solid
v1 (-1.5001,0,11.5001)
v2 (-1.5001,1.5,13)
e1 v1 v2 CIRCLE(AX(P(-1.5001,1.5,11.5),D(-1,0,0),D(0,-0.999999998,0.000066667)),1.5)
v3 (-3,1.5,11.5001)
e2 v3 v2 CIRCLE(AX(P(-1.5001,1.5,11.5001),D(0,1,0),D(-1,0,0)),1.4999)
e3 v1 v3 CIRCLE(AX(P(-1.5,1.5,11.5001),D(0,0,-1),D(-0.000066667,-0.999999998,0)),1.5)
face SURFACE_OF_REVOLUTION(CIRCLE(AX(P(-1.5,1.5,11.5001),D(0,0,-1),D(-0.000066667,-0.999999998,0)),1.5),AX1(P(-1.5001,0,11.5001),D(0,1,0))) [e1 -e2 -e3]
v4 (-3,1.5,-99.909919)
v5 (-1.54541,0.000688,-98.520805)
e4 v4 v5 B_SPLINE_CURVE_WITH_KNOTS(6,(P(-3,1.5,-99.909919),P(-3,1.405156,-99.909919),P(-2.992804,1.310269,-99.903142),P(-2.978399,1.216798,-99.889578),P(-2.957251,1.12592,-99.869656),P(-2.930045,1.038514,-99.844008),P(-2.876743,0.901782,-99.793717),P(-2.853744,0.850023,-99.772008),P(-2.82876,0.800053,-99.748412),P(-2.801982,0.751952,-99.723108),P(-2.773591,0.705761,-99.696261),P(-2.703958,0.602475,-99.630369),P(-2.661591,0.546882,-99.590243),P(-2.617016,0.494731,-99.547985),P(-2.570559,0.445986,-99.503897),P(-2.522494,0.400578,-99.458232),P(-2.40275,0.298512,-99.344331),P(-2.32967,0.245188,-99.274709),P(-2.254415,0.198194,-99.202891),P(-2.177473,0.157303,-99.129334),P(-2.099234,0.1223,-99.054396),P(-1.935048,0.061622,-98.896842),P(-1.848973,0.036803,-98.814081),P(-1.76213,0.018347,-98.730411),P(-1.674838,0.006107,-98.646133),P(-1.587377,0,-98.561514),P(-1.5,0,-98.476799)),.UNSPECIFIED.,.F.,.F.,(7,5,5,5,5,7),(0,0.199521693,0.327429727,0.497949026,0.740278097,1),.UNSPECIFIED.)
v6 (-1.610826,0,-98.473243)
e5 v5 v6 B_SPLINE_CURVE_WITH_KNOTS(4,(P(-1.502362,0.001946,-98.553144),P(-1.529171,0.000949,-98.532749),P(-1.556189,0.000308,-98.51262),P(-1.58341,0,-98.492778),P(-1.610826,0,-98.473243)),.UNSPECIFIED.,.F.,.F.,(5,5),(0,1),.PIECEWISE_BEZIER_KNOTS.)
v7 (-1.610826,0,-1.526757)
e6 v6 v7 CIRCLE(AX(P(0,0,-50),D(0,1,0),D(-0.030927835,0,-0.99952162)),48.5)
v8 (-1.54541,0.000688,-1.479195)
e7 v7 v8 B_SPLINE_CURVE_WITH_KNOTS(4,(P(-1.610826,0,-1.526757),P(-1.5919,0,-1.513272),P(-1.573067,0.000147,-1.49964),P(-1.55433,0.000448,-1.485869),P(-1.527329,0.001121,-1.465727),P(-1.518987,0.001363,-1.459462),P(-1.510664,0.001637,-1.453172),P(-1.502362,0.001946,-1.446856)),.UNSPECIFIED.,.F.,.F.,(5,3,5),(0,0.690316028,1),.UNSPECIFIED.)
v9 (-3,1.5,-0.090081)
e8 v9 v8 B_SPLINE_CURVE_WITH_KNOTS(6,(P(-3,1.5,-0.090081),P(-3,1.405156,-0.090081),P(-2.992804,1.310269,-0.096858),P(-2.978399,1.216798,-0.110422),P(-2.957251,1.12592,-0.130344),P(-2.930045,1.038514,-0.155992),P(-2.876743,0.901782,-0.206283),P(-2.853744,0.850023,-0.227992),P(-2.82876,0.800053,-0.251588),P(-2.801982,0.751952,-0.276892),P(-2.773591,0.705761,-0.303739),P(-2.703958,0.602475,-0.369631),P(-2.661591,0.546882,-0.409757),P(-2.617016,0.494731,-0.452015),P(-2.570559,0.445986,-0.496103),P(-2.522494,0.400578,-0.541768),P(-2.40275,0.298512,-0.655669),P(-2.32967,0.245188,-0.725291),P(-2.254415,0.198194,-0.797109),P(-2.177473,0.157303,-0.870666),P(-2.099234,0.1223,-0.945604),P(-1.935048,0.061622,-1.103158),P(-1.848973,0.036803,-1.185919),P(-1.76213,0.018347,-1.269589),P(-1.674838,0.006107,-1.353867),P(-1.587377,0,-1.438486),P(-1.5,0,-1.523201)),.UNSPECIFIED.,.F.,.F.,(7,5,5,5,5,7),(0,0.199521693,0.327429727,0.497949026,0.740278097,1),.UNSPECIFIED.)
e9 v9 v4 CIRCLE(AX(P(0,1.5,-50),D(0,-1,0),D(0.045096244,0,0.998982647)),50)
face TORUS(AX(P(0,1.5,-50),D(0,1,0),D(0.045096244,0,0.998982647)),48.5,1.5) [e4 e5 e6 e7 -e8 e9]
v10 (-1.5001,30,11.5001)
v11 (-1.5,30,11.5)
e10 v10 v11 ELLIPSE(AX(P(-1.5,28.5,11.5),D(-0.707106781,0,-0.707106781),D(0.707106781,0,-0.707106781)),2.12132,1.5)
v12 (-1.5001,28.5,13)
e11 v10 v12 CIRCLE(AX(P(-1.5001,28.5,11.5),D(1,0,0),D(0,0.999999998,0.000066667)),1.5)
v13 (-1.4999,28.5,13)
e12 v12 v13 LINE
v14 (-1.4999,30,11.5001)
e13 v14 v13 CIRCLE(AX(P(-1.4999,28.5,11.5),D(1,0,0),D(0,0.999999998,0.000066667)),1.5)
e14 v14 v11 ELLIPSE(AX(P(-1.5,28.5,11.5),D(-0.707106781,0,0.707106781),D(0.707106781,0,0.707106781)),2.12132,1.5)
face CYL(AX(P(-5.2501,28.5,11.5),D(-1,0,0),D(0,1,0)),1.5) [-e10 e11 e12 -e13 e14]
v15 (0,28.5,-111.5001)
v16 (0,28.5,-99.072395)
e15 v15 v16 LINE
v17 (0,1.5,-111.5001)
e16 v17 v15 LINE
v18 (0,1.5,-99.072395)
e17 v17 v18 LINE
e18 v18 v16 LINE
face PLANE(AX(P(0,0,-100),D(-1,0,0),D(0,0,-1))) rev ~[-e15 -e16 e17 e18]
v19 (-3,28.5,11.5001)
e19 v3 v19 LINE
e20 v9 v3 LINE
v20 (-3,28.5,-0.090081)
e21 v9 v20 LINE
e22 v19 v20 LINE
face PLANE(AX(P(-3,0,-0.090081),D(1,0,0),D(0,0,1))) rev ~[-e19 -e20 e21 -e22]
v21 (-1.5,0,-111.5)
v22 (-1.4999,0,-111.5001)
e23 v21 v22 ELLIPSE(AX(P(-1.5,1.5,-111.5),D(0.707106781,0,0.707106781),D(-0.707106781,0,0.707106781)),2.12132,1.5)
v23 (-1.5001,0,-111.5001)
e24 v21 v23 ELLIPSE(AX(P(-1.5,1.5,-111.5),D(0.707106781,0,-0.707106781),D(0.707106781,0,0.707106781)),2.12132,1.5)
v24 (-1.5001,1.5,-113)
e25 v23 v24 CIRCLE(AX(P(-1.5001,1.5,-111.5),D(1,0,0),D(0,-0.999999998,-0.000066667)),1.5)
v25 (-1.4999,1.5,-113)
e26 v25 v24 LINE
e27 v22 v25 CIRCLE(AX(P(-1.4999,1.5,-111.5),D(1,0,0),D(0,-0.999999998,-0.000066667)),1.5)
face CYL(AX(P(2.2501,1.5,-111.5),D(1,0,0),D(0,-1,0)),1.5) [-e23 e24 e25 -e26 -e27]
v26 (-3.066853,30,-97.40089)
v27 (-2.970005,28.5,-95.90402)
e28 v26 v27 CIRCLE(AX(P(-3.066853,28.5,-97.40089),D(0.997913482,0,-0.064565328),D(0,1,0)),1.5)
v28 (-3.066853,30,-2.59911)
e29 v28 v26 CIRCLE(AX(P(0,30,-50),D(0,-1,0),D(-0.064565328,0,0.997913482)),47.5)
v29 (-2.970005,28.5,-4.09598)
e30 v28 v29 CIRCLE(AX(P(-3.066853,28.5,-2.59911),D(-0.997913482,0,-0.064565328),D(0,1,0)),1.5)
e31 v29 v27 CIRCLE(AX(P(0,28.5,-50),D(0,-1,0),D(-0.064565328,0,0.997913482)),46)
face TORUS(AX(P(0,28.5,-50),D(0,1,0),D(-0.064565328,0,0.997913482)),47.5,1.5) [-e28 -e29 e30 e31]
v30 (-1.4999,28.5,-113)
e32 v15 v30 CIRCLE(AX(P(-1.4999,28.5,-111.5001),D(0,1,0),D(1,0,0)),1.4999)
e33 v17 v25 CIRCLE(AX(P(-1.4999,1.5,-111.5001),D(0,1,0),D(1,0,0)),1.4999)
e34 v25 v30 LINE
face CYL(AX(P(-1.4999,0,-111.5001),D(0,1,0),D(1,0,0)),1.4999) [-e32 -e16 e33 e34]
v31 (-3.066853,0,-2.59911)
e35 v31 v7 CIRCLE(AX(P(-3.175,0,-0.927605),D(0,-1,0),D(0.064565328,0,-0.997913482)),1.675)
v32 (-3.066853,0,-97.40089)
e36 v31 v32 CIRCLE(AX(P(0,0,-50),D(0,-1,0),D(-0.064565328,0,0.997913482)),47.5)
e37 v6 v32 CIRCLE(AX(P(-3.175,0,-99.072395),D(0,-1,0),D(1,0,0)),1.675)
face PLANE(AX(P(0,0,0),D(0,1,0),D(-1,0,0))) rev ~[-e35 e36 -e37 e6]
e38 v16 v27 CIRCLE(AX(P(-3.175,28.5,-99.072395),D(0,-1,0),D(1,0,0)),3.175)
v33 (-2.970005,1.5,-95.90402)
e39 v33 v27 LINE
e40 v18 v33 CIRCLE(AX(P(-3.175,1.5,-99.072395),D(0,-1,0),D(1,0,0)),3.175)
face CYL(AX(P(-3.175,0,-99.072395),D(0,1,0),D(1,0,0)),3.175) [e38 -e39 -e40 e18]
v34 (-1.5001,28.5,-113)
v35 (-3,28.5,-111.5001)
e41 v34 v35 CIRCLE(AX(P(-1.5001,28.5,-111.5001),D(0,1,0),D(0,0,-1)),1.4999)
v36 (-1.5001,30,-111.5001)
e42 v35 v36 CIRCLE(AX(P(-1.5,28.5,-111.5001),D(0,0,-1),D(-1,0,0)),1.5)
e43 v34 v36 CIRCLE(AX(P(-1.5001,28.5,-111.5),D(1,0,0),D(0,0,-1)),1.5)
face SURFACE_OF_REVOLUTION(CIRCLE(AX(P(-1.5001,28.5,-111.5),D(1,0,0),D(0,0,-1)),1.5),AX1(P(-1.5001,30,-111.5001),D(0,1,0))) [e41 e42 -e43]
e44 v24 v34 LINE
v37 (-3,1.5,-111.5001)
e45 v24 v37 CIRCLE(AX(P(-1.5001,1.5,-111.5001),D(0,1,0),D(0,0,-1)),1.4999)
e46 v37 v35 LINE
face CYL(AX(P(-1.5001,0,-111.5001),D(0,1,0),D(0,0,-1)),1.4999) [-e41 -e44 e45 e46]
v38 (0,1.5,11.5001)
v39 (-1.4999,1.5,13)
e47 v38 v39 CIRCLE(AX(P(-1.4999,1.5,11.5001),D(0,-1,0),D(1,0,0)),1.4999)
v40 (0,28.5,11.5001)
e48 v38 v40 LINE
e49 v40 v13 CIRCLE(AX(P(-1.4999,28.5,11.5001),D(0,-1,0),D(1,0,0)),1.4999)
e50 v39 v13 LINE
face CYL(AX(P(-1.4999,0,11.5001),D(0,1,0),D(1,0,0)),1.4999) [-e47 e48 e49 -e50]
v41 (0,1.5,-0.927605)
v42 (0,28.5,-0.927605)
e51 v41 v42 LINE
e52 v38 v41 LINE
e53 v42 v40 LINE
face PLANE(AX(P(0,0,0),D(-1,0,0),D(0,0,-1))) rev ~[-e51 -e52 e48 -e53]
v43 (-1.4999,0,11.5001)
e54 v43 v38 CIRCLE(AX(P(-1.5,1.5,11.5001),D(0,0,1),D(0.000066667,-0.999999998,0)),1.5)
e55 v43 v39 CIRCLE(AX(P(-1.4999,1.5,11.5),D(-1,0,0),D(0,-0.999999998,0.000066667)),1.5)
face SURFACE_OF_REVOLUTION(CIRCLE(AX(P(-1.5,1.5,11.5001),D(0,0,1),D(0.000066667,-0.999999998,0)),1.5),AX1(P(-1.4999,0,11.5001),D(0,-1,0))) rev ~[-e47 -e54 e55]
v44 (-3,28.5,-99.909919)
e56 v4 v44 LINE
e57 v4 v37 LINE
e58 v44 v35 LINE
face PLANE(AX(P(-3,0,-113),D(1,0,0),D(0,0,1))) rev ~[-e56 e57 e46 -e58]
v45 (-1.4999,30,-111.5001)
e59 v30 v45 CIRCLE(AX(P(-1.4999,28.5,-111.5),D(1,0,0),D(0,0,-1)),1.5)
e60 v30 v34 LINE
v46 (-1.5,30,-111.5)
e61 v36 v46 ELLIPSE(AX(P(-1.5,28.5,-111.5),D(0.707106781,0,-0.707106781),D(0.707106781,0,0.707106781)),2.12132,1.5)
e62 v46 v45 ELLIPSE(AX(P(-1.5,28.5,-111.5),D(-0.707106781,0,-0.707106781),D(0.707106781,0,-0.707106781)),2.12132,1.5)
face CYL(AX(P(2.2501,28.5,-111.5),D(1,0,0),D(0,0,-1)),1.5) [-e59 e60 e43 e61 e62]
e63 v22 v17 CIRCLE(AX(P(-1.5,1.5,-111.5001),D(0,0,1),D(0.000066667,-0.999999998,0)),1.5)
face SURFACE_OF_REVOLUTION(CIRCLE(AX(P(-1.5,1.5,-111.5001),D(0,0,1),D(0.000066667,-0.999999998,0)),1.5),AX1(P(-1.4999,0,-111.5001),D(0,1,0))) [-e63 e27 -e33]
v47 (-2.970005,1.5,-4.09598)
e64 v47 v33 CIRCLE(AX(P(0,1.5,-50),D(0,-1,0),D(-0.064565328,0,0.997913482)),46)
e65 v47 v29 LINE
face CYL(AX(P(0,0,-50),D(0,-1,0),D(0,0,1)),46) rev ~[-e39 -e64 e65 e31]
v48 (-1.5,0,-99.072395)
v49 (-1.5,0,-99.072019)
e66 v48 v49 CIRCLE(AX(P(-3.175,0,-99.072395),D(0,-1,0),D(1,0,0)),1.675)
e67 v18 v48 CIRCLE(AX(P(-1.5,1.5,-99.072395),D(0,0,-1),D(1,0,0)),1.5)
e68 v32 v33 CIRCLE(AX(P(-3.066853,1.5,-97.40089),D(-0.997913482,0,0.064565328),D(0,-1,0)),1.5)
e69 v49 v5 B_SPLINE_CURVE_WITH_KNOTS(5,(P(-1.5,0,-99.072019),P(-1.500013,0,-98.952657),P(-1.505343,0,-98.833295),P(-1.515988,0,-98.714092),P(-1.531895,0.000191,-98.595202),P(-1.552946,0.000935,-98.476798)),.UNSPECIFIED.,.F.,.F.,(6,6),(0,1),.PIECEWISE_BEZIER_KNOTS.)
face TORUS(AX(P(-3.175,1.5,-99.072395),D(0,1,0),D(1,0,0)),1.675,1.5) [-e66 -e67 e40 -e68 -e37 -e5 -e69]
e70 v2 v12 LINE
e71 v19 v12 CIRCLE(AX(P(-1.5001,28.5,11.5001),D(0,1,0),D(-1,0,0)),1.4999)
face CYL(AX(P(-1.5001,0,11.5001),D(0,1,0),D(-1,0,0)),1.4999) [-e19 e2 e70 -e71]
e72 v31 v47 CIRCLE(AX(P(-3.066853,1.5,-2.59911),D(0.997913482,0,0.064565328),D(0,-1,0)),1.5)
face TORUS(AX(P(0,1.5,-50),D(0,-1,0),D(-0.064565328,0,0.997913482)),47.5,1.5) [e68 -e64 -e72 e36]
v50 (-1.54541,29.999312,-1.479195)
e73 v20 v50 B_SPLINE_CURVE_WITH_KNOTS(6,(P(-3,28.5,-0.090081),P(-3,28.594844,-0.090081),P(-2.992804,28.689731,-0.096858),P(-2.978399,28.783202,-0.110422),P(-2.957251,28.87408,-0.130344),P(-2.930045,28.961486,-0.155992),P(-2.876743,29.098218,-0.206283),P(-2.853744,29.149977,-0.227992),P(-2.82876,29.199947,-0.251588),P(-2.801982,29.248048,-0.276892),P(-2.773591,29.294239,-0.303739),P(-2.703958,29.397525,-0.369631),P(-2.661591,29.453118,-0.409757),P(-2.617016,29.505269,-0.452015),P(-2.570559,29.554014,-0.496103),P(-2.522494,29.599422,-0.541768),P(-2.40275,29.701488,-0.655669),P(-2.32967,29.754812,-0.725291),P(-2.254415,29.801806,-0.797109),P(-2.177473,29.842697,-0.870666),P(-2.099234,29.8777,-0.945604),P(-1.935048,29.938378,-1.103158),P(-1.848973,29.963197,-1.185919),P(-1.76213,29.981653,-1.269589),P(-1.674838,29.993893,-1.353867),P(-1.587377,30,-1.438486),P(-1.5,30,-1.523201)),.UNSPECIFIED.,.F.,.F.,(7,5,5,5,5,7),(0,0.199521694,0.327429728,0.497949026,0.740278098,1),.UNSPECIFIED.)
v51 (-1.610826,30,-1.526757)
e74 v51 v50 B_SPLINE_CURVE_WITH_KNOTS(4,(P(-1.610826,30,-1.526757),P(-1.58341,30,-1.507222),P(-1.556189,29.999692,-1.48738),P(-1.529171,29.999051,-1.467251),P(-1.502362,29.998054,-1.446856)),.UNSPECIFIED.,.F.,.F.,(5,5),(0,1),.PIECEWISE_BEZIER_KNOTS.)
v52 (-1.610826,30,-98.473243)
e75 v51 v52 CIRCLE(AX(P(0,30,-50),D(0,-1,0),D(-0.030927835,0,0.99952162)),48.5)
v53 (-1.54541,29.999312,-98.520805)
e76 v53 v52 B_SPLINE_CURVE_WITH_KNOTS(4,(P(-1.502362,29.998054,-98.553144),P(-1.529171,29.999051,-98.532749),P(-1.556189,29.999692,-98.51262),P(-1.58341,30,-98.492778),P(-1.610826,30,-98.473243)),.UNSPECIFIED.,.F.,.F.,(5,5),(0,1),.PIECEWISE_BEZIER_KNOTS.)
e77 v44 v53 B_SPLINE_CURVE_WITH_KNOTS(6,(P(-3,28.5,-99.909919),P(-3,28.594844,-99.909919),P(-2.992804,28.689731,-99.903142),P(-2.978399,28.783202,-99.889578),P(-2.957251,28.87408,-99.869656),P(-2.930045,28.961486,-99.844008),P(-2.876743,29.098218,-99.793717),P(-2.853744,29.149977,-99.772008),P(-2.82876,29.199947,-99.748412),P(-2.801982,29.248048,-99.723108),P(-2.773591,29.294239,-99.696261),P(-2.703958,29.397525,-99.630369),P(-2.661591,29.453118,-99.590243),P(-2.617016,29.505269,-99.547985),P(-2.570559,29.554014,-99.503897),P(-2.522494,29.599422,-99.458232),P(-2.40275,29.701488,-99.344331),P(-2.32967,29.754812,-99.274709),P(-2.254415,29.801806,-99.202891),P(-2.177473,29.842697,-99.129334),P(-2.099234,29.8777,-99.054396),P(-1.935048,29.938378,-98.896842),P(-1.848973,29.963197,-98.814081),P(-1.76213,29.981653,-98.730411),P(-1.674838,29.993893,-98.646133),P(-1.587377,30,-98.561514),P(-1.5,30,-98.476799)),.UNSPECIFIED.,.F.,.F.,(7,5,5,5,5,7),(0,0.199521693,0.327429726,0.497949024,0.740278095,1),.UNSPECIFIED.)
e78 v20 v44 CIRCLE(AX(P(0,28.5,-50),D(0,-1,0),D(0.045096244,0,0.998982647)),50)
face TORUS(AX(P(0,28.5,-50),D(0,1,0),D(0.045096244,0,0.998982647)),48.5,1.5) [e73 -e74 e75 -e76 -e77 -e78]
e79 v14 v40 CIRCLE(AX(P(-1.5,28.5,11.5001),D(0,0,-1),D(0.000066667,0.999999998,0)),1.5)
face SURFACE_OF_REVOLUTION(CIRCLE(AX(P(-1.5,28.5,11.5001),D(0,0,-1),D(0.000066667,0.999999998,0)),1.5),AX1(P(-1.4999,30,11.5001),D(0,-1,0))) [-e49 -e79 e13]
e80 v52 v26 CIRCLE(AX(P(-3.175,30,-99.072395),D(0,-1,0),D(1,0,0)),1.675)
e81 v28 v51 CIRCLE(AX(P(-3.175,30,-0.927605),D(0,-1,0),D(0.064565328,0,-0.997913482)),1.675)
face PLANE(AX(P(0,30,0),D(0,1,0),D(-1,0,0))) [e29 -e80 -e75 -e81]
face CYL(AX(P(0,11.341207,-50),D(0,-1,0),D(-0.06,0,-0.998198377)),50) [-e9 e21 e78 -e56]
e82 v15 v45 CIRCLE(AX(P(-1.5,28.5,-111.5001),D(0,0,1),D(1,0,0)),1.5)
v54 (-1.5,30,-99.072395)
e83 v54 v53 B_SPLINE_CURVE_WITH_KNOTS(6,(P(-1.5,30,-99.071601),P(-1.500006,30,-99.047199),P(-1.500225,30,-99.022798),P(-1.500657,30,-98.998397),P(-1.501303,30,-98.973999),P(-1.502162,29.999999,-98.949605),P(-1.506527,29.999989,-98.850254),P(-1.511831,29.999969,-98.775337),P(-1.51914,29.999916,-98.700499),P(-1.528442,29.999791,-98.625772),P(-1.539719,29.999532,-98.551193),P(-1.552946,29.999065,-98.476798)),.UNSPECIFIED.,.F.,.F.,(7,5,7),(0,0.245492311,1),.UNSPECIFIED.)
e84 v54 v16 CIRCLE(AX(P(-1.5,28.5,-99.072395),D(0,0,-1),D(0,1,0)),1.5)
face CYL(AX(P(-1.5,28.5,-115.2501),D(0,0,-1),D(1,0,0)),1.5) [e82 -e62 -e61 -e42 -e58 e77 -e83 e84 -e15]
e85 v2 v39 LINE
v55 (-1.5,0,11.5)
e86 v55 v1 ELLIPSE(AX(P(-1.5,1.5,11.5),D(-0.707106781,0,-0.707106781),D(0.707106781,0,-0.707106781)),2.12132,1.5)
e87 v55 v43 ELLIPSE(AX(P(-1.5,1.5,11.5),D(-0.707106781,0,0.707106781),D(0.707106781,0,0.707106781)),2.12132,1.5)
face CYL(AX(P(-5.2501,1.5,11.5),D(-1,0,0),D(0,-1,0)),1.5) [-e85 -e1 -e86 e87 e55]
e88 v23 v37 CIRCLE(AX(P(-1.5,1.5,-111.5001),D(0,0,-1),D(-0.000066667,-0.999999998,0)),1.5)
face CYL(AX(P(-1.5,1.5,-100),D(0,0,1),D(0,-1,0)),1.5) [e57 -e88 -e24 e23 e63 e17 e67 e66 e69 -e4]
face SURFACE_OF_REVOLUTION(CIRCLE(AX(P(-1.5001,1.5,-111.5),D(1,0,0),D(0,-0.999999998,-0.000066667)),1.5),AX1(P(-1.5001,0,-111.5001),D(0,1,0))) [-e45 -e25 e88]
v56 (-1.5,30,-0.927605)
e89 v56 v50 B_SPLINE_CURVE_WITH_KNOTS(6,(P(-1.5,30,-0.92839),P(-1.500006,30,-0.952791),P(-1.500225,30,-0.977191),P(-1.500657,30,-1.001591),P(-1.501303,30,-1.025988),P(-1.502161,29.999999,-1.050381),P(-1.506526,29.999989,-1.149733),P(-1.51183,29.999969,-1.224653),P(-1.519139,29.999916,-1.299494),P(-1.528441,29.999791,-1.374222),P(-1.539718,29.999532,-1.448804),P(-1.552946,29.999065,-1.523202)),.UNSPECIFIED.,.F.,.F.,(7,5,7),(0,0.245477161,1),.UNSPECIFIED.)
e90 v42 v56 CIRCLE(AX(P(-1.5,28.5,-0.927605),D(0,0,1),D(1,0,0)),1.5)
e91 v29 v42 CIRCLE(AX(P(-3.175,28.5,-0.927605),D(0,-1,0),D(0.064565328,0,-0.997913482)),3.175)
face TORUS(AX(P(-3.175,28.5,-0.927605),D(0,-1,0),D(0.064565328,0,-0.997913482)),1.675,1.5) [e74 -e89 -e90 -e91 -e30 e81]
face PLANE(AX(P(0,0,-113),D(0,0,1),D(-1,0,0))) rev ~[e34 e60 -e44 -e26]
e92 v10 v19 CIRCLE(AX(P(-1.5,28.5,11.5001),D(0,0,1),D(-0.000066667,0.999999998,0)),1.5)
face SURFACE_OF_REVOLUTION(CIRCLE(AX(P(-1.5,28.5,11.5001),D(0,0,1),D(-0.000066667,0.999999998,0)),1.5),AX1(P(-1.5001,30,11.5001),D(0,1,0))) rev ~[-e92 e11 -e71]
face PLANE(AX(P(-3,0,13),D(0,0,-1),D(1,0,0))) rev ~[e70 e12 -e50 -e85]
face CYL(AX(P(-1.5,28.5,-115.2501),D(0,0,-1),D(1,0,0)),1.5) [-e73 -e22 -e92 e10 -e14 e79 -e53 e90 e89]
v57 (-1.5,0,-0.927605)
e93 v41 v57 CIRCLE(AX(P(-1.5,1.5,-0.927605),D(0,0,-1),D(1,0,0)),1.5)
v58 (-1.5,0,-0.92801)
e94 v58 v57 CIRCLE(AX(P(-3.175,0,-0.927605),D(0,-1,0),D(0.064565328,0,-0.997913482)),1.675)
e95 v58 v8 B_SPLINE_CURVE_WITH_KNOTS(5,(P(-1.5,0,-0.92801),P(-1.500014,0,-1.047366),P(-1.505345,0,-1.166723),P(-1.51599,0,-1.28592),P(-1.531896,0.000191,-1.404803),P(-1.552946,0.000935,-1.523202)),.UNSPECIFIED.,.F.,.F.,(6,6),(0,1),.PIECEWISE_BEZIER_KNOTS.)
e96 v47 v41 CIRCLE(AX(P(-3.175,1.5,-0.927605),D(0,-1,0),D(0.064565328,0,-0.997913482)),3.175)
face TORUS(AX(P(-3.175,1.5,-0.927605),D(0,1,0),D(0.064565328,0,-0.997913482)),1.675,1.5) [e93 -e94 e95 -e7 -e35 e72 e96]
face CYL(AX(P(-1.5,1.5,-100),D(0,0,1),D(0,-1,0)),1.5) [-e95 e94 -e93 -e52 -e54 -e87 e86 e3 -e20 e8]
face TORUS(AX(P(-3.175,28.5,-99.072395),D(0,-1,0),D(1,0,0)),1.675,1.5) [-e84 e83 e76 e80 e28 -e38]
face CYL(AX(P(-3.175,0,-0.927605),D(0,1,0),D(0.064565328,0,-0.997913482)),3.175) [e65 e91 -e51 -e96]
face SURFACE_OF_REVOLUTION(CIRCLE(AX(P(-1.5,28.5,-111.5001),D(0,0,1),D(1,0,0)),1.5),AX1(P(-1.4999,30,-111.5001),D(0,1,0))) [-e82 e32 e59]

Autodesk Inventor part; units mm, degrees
ref_plane "YZ Plane" through (0, 0, 0) normal (1, 0, 0) x (0, 1, 0)
ref_plane "XZ Plane" through (0, 0, 0) normal (0, 1, 0) x (-1, 0, 0)
ref_plane "XY Plane" through (0, 0, 0) normal (0, 0, 1) x (1, 0, 0)
sketch "Sketch1" plane through (0, 0, 0) normal (0, 1, 0) x (-1, 0, 0)
  line L0 (0, 0) -> (0, -100)
  line L1 (0, -50) -> (50, -50)
  circle A0 centre (0, -50) radius 50
  line L2 (50, -50) -> (46, -50)
  line L3 (0, 0) -> (0, 13)
  line L4 (0, -100) -> (0, -113)
  circle A1 centre (0, -50) radius 46
  line L5 (0, 13) -> (3, 13)
  line L6 (3, 13) -> (3, -0.99065)
  line L7 (3, -0.99065) -> (0, -0.99065)
  line L8 (0, -0.99065) -> (0, 13)
  line L9 (0, -113) -> (3, -113)
  line L10 (3, -113) -> (3, -98.99687)
  line L11 (3, -98.99687) -> (0, -98.99687)
  line L12 (0, -98.99687) -> (0, -113)
  point P0 (0, -4)
  point P1 (0, -96)
  point P2 (3, -99.909919)
  point P3 (3, -0.090081)
  dimension "d0" = 100
  dimension "d1" = 50
  dimension "d2" = 4
  dimension "d3" = 13
  dimension "d4" = 13
  dimension "d5" = 3
  dimension "d6" = 3
sketch "Sketch1 outline for Extrusion1" plane through (0, 0, 0) normal (0, 1, 0) x (-1, 0, 0)
  line L0 (3, 13) -> (0, 13)
  line L1 (3, -0.090081) -> (3, 13)
  arc A0 (3, -99.909919) -> (3, -0.090081) centre (0, -50) ccw
  line L2 (3, -113) -> (3, -99.909919)
  line L3 (0, -113) -> (3, -113)
  line L4 (0, -100) -> (0, -113)
  line L5 (0, -96) -> (0, -100)
  arc A1 (0, -4) -> (0, -96) centre (0, -50) cw
  line L6 (0, 0) -> (0, -4)
  line L7 (0, 13) -> (0, 0)
extrude "Extrusion1" add sketch "Sketch1 outline for Extrusion1" along normal blind 30
fillet "Fillet1" radius 3.175 2 edges at (0, 15, -96) (0, 15, -4)
fillet "Fillet2" radius 1.5 4 edges at (-3, 15, 13) (0, 15, 13) (-3, 15, -113) (0, 15, -113)
fillet "Fillet3" radius 1.5 20 edges at (-0.8586, 30, -96.901) (-0.8586, 30, -3.099) (0, 30, -99.5362) (0, 30, -0.4638) (-2.5607, 30, -112.5607) (-3, 30, -105.705) (-2.5607, 30, 12.5607) (-3, 30, 5.705) (-46, 30, -50) (-50, 30, -50) (-0.8586, 0, -96.901) (-0.8586, 0, -3.099) (0, 0, -99.5362) (0, 0, -0.4638) (-2.5607, 0, -112.5607) (-3, 0, -105.705) (-2.5607, 0, 12.5607) (-3, 0, 5.705) (-46, 0, -50) (-50, 0, -50)
properties part number "handle"
